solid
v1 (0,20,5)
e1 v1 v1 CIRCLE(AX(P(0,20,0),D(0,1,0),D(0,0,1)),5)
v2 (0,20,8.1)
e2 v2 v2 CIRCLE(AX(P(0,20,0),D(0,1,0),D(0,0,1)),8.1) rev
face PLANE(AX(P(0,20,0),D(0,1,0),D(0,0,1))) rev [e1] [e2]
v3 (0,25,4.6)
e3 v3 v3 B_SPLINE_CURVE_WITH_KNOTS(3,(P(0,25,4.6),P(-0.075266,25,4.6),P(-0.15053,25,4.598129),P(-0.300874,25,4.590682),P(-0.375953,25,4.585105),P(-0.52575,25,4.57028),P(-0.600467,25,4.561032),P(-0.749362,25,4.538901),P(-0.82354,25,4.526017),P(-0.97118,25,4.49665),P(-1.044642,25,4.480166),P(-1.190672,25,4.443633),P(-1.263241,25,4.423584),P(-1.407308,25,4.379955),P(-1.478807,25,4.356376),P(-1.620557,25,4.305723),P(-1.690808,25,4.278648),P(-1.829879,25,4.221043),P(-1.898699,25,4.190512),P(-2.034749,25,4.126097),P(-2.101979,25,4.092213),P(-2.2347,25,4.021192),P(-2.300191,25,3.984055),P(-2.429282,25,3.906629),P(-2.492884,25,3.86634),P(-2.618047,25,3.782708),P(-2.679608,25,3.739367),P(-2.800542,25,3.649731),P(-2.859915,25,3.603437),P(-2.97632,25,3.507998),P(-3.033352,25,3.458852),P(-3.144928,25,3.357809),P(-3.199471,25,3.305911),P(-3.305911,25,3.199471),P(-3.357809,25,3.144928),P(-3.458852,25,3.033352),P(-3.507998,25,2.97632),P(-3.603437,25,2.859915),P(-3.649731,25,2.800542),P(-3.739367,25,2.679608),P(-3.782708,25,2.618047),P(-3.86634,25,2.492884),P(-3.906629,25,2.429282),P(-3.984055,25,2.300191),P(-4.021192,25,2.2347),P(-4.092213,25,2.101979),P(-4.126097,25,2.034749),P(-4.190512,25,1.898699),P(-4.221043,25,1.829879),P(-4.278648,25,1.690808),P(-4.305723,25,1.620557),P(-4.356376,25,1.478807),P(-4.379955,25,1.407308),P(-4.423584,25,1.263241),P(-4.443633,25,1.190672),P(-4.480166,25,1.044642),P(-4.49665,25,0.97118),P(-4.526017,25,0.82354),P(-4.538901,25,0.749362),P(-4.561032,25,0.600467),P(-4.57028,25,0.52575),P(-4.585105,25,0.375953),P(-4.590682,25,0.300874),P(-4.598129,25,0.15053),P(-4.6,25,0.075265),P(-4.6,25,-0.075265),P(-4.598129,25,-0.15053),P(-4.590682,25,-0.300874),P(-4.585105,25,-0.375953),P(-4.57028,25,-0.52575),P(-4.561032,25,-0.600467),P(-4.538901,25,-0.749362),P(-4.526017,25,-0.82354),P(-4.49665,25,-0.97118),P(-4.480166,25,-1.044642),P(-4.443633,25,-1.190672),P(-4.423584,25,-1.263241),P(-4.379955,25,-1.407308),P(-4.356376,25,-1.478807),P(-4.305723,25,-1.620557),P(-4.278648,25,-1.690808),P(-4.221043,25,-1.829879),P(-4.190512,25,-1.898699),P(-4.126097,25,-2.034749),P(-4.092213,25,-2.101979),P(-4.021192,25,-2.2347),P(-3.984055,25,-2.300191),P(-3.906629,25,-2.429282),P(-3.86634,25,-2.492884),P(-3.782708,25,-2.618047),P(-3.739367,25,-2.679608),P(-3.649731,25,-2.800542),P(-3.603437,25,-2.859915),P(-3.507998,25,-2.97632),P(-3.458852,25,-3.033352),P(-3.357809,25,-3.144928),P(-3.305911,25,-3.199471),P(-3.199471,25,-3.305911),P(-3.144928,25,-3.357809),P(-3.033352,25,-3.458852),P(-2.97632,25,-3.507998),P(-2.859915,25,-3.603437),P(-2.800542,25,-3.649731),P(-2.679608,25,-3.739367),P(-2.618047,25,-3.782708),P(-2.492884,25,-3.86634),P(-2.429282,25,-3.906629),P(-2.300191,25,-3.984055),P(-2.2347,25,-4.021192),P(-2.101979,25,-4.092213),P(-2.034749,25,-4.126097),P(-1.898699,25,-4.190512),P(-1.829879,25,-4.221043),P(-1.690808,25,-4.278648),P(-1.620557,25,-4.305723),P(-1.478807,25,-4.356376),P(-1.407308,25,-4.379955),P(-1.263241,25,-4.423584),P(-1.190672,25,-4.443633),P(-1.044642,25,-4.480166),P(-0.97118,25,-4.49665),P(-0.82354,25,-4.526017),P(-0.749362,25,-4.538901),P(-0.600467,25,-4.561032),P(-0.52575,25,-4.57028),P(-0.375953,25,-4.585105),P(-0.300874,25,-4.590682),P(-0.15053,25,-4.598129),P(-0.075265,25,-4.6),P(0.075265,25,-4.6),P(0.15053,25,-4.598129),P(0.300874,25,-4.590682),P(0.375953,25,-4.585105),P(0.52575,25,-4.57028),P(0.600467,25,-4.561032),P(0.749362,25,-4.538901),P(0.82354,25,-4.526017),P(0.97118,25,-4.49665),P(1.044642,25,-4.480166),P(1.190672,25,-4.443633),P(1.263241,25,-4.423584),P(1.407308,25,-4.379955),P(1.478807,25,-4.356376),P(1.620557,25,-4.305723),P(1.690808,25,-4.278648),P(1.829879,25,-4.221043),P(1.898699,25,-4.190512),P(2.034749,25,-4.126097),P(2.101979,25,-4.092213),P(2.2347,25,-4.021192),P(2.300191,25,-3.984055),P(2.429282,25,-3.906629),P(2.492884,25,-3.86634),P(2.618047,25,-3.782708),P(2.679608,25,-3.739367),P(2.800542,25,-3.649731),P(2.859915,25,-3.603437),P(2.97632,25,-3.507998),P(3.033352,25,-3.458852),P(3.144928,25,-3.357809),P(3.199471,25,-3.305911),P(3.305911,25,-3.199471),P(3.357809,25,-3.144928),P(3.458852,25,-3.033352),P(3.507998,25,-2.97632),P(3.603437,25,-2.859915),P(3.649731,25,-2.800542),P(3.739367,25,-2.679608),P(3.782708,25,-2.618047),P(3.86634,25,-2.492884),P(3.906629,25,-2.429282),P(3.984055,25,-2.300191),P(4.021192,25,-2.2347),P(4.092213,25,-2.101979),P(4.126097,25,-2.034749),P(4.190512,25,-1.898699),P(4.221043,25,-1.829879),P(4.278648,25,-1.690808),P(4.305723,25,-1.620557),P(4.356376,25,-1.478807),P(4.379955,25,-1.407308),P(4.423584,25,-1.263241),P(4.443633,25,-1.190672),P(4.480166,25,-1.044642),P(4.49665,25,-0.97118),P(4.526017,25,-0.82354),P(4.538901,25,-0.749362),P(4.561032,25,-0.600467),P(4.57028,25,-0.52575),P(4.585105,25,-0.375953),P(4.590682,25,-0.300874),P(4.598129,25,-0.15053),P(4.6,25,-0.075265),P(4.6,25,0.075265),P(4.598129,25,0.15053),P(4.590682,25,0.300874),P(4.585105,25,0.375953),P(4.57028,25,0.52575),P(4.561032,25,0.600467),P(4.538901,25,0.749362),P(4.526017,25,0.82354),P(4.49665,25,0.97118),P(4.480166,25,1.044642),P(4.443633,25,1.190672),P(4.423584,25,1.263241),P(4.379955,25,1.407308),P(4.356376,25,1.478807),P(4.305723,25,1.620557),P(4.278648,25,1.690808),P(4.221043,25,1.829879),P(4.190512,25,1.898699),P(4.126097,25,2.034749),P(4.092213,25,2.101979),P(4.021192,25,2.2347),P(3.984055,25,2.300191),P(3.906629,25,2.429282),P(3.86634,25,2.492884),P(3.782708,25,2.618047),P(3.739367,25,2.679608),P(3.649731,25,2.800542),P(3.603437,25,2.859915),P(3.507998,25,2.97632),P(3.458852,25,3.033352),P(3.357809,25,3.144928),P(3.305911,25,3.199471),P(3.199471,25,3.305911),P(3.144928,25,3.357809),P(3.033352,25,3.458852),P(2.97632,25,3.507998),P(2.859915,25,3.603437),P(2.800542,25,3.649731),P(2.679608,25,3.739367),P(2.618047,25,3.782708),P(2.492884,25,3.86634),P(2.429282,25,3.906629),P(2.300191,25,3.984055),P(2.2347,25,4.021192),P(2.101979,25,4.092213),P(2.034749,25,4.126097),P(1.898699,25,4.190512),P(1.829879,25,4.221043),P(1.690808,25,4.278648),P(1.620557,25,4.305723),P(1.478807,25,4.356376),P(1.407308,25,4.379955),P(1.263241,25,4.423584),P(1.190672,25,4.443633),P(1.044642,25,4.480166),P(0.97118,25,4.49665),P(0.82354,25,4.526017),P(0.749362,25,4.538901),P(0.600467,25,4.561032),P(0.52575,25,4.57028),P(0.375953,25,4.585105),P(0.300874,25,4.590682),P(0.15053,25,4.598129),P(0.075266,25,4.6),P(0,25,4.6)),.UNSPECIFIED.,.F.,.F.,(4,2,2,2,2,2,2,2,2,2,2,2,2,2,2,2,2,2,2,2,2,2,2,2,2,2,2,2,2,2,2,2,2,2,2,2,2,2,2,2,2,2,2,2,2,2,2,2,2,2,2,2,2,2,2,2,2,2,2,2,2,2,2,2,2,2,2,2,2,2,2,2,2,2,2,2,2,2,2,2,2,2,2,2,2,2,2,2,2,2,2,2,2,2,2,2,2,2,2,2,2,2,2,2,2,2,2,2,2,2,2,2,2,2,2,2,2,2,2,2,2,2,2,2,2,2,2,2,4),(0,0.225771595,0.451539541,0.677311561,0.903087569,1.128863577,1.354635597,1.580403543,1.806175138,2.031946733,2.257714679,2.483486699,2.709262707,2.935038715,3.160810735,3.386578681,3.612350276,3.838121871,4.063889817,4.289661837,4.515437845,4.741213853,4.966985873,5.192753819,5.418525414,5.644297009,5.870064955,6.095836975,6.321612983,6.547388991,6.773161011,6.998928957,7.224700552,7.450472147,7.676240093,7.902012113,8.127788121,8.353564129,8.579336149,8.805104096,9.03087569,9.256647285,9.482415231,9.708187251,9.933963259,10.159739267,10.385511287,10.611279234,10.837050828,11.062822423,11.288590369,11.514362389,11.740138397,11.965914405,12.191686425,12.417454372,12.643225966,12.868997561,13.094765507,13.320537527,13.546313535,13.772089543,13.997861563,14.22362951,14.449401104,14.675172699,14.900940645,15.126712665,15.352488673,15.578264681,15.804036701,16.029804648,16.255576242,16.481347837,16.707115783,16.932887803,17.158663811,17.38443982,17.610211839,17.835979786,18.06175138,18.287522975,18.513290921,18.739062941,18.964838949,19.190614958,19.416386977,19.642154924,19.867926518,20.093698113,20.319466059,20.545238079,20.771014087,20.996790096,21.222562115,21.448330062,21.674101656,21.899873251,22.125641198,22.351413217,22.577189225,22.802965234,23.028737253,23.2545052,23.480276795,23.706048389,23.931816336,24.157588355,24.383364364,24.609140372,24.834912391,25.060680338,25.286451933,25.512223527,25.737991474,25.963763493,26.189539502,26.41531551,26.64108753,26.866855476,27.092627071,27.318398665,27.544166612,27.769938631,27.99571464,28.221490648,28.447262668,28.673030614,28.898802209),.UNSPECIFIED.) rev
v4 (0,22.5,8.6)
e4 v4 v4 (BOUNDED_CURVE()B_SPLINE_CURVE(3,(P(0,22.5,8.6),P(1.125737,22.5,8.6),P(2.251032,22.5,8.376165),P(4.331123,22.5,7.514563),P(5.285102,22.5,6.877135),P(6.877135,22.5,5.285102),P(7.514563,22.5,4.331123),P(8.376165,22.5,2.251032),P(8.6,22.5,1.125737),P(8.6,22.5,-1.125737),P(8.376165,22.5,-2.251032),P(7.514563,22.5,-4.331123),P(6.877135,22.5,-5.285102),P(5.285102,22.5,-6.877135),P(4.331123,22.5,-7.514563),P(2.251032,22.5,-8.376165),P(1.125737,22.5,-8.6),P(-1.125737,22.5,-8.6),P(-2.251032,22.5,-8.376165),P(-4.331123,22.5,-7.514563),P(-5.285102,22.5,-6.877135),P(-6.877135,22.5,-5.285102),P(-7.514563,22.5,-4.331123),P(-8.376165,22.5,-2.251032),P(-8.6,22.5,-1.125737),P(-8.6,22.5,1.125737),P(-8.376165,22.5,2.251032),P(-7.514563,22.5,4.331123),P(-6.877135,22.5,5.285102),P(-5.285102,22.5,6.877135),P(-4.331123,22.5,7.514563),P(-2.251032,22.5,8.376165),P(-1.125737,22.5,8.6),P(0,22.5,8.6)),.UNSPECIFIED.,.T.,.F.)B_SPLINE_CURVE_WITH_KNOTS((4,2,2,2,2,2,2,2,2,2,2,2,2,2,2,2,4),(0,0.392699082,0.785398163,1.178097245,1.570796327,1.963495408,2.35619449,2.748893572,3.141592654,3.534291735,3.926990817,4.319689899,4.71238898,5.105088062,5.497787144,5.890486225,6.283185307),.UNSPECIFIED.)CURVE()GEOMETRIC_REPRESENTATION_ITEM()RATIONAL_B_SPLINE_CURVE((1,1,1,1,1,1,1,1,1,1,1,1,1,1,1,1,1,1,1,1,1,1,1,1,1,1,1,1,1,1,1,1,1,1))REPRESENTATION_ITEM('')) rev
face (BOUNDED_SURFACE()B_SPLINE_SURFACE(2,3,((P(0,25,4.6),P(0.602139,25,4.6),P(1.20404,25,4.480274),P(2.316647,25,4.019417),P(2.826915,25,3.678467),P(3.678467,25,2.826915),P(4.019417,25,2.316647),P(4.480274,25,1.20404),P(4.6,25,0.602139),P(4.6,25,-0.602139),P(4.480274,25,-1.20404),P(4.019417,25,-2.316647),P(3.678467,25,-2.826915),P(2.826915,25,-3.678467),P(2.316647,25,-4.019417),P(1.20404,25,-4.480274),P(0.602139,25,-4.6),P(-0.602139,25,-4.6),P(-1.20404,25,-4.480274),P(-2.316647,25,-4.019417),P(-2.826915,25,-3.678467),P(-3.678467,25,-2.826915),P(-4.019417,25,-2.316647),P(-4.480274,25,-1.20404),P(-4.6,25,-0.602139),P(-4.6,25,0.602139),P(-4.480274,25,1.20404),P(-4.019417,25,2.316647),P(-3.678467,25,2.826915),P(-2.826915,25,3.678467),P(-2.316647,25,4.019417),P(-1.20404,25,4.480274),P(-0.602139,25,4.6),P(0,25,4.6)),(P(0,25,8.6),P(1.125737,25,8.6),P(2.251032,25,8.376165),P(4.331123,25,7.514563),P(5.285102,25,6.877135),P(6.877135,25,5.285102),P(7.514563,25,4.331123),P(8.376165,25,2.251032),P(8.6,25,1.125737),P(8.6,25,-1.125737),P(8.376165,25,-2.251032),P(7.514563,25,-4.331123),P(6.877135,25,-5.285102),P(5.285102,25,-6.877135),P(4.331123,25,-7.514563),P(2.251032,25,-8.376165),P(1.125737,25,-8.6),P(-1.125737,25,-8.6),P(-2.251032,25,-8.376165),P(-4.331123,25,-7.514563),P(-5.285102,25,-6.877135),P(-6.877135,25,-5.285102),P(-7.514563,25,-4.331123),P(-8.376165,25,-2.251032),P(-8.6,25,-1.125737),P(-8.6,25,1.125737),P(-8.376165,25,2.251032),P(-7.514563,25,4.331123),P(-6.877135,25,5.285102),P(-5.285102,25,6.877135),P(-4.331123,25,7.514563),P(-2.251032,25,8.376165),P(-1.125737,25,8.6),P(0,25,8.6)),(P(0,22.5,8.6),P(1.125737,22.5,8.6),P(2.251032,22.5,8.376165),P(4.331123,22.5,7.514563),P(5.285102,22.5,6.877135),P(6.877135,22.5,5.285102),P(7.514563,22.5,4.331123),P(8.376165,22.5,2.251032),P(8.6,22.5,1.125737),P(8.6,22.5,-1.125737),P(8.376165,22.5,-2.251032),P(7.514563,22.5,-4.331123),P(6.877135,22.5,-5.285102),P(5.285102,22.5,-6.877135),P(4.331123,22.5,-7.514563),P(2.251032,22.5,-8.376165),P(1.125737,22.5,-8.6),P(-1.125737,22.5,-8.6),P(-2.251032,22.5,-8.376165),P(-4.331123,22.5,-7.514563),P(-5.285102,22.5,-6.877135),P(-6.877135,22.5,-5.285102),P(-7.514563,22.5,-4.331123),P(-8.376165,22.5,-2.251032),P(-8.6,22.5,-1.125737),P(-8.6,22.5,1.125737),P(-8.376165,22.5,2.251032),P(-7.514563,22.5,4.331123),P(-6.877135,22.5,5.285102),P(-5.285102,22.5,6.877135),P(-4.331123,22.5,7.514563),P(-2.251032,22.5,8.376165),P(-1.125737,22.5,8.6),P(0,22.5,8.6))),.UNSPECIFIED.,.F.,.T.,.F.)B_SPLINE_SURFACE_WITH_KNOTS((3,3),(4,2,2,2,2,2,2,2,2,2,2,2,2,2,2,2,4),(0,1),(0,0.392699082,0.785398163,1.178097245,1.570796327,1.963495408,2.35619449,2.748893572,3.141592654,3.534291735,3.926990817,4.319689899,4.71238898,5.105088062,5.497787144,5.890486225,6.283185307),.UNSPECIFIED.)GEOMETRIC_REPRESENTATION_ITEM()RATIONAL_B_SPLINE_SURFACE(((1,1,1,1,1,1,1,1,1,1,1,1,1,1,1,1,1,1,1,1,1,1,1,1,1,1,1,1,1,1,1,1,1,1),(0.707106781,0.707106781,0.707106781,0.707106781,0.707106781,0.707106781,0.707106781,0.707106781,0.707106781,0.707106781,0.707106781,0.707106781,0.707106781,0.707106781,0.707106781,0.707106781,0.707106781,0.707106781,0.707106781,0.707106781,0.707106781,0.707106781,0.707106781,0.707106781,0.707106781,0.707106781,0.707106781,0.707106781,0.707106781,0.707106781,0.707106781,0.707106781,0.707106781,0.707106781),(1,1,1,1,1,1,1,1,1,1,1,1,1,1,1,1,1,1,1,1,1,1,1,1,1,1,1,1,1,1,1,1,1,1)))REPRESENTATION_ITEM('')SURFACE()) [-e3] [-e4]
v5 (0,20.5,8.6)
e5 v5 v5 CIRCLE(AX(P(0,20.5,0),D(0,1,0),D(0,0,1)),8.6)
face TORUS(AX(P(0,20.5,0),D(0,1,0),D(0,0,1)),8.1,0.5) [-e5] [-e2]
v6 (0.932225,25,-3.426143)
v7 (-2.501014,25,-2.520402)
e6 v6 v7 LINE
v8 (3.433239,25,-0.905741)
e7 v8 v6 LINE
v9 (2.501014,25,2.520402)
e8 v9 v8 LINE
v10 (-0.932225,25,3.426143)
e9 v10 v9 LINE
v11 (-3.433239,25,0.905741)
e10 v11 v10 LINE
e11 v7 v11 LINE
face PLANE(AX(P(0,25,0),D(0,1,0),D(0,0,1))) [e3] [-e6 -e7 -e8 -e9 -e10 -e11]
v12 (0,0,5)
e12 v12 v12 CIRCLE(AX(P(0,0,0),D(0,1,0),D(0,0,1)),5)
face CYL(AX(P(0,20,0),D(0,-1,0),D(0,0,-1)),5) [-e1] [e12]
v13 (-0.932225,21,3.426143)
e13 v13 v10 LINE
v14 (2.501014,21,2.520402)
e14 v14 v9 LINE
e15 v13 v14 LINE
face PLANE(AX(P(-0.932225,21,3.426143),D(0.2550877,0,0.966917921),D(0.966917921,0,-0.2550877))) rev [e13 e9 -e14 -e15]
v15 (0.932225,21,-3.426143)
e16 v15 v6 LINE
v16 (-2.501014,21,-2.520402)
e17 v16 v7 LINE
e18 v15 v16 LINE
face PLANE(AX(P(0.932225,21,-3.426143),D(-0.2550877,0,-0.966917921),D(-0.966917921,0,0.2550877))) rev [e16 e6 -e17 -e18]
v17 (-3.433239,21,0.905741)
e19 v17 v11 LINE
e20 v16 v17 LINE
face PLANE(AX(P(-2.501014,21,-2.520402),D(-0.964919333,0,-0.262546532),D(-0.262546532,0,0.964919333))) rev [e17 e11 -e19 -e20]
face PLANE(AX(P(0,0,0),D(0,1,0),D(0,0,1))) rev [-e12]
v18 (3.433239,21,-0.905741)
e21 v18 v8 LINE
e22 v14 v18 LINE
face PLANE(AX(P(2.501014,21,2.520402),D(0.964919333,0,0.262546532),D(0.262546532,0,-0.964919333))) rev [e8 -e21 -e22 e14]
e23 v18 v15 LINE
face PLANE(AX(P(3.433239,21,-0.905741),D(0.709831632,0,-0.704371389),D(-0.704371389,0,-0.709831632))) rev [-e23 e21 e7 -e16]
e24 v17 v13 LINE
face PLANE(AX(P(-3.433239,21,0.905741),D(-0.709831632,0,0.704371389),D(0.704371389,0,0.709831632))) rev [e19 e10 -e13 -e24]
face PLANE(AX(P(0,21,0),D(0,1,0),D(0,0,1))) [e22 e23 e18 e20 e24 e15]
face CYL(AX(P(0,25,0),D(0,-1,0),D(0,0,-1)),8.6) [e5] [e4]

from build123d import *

# Parameters (mm, degrees)
SKETCH1_R           = 5
BOSS_EXTRUDE1_DEPTH = 20
SKETCH2_R           = 8.6
BOSS_EXTRUDE2_DEPTH = 5
FILLET1_SIZE        = 2.5
FILLET1_SIZE_2      = 4
CUT_EXTRUDE1_DEPTH  = 4
FILLET2_R           = 0.5


with BuildPart() as part:
    # Sketch1 → Boss-Extrude1 (new body)
    with BuildSketch(Plane(origin=(0, 0, 0), x_dir=(1, 0, 0), z_dir=(0, 1, 0))):
        with Locations(Location((0, 0, 0), (0, 0, 270))):
            Circle(SKETCH1_R)
    extrude(amount=BOSS_EXTRUDE1_DEPTH)

    # Sketch2 → Boss-Extrude2 (add)
    with BuildSketch(Plane(origin=(0, 20, 0), x_dir=(1, 0, 0), z_dir=(0, 1, 0))):
        with Locations(Location((0, 0, 0), (0, 0, 270))):
            Circle(SKETCH2_R)
    extrude(amount=BOSS_EXTRUDE2_DEPTH)

    # Fillet1
    # an asymmetric fillet: 4, 2.5 mm, written as the material it takes off along each edge
    with BuildSketch(Plane(origin=(0, 25, 0), x_dir=(0, 0, 1), z_dir=(-1, 0, 0))) as fillet1_piece_1:
        with BuildLine():
            Bezier((8.6, -FILLET1_SIZE), (8.6, 0), (8.6 - FILLET1_SIZE_2, 0), weights=[1, 0.707106781, 1])
            Line((8.6 - FILLET1_SIZE_2, 0), (8.6, 0))
            Line((8.6, 0), (8.6, -FILLET1_SIZE))
        make_face()
    revolve(axis=Axis((0, 25, 0), (0, 1, 0)), mode=Mode.SUBTRACT)

    # Sketch3 → Cut-Extrude1 (cut)
    with BuildSketch(Plane(origin=(0, 25, 0), x_dir=(1, 0, 0), z_dir=(0, 1, 0))):
        Polygon((2.501014418, -2.520402127), (3.433239479, 0.905740958), (0.93222506, 3.426143085), (-2.501014418, 2.520402127), (-3.433239479, -0.905740958), (-0.93222506, -3.426143085), align=None)
    extrude(amount=-CUT_EXTRUDE1_DEPTH, mode=Mode.SUBTRACT)

    # Fillet2
    fillet2_edges = [part.edges().sort_by_distance(p)[0] for p in [
        (0, 20, -8.6),
    ]]
    fillet(fillet2_edges, radius=FILLET2_R)


solid = part.part
